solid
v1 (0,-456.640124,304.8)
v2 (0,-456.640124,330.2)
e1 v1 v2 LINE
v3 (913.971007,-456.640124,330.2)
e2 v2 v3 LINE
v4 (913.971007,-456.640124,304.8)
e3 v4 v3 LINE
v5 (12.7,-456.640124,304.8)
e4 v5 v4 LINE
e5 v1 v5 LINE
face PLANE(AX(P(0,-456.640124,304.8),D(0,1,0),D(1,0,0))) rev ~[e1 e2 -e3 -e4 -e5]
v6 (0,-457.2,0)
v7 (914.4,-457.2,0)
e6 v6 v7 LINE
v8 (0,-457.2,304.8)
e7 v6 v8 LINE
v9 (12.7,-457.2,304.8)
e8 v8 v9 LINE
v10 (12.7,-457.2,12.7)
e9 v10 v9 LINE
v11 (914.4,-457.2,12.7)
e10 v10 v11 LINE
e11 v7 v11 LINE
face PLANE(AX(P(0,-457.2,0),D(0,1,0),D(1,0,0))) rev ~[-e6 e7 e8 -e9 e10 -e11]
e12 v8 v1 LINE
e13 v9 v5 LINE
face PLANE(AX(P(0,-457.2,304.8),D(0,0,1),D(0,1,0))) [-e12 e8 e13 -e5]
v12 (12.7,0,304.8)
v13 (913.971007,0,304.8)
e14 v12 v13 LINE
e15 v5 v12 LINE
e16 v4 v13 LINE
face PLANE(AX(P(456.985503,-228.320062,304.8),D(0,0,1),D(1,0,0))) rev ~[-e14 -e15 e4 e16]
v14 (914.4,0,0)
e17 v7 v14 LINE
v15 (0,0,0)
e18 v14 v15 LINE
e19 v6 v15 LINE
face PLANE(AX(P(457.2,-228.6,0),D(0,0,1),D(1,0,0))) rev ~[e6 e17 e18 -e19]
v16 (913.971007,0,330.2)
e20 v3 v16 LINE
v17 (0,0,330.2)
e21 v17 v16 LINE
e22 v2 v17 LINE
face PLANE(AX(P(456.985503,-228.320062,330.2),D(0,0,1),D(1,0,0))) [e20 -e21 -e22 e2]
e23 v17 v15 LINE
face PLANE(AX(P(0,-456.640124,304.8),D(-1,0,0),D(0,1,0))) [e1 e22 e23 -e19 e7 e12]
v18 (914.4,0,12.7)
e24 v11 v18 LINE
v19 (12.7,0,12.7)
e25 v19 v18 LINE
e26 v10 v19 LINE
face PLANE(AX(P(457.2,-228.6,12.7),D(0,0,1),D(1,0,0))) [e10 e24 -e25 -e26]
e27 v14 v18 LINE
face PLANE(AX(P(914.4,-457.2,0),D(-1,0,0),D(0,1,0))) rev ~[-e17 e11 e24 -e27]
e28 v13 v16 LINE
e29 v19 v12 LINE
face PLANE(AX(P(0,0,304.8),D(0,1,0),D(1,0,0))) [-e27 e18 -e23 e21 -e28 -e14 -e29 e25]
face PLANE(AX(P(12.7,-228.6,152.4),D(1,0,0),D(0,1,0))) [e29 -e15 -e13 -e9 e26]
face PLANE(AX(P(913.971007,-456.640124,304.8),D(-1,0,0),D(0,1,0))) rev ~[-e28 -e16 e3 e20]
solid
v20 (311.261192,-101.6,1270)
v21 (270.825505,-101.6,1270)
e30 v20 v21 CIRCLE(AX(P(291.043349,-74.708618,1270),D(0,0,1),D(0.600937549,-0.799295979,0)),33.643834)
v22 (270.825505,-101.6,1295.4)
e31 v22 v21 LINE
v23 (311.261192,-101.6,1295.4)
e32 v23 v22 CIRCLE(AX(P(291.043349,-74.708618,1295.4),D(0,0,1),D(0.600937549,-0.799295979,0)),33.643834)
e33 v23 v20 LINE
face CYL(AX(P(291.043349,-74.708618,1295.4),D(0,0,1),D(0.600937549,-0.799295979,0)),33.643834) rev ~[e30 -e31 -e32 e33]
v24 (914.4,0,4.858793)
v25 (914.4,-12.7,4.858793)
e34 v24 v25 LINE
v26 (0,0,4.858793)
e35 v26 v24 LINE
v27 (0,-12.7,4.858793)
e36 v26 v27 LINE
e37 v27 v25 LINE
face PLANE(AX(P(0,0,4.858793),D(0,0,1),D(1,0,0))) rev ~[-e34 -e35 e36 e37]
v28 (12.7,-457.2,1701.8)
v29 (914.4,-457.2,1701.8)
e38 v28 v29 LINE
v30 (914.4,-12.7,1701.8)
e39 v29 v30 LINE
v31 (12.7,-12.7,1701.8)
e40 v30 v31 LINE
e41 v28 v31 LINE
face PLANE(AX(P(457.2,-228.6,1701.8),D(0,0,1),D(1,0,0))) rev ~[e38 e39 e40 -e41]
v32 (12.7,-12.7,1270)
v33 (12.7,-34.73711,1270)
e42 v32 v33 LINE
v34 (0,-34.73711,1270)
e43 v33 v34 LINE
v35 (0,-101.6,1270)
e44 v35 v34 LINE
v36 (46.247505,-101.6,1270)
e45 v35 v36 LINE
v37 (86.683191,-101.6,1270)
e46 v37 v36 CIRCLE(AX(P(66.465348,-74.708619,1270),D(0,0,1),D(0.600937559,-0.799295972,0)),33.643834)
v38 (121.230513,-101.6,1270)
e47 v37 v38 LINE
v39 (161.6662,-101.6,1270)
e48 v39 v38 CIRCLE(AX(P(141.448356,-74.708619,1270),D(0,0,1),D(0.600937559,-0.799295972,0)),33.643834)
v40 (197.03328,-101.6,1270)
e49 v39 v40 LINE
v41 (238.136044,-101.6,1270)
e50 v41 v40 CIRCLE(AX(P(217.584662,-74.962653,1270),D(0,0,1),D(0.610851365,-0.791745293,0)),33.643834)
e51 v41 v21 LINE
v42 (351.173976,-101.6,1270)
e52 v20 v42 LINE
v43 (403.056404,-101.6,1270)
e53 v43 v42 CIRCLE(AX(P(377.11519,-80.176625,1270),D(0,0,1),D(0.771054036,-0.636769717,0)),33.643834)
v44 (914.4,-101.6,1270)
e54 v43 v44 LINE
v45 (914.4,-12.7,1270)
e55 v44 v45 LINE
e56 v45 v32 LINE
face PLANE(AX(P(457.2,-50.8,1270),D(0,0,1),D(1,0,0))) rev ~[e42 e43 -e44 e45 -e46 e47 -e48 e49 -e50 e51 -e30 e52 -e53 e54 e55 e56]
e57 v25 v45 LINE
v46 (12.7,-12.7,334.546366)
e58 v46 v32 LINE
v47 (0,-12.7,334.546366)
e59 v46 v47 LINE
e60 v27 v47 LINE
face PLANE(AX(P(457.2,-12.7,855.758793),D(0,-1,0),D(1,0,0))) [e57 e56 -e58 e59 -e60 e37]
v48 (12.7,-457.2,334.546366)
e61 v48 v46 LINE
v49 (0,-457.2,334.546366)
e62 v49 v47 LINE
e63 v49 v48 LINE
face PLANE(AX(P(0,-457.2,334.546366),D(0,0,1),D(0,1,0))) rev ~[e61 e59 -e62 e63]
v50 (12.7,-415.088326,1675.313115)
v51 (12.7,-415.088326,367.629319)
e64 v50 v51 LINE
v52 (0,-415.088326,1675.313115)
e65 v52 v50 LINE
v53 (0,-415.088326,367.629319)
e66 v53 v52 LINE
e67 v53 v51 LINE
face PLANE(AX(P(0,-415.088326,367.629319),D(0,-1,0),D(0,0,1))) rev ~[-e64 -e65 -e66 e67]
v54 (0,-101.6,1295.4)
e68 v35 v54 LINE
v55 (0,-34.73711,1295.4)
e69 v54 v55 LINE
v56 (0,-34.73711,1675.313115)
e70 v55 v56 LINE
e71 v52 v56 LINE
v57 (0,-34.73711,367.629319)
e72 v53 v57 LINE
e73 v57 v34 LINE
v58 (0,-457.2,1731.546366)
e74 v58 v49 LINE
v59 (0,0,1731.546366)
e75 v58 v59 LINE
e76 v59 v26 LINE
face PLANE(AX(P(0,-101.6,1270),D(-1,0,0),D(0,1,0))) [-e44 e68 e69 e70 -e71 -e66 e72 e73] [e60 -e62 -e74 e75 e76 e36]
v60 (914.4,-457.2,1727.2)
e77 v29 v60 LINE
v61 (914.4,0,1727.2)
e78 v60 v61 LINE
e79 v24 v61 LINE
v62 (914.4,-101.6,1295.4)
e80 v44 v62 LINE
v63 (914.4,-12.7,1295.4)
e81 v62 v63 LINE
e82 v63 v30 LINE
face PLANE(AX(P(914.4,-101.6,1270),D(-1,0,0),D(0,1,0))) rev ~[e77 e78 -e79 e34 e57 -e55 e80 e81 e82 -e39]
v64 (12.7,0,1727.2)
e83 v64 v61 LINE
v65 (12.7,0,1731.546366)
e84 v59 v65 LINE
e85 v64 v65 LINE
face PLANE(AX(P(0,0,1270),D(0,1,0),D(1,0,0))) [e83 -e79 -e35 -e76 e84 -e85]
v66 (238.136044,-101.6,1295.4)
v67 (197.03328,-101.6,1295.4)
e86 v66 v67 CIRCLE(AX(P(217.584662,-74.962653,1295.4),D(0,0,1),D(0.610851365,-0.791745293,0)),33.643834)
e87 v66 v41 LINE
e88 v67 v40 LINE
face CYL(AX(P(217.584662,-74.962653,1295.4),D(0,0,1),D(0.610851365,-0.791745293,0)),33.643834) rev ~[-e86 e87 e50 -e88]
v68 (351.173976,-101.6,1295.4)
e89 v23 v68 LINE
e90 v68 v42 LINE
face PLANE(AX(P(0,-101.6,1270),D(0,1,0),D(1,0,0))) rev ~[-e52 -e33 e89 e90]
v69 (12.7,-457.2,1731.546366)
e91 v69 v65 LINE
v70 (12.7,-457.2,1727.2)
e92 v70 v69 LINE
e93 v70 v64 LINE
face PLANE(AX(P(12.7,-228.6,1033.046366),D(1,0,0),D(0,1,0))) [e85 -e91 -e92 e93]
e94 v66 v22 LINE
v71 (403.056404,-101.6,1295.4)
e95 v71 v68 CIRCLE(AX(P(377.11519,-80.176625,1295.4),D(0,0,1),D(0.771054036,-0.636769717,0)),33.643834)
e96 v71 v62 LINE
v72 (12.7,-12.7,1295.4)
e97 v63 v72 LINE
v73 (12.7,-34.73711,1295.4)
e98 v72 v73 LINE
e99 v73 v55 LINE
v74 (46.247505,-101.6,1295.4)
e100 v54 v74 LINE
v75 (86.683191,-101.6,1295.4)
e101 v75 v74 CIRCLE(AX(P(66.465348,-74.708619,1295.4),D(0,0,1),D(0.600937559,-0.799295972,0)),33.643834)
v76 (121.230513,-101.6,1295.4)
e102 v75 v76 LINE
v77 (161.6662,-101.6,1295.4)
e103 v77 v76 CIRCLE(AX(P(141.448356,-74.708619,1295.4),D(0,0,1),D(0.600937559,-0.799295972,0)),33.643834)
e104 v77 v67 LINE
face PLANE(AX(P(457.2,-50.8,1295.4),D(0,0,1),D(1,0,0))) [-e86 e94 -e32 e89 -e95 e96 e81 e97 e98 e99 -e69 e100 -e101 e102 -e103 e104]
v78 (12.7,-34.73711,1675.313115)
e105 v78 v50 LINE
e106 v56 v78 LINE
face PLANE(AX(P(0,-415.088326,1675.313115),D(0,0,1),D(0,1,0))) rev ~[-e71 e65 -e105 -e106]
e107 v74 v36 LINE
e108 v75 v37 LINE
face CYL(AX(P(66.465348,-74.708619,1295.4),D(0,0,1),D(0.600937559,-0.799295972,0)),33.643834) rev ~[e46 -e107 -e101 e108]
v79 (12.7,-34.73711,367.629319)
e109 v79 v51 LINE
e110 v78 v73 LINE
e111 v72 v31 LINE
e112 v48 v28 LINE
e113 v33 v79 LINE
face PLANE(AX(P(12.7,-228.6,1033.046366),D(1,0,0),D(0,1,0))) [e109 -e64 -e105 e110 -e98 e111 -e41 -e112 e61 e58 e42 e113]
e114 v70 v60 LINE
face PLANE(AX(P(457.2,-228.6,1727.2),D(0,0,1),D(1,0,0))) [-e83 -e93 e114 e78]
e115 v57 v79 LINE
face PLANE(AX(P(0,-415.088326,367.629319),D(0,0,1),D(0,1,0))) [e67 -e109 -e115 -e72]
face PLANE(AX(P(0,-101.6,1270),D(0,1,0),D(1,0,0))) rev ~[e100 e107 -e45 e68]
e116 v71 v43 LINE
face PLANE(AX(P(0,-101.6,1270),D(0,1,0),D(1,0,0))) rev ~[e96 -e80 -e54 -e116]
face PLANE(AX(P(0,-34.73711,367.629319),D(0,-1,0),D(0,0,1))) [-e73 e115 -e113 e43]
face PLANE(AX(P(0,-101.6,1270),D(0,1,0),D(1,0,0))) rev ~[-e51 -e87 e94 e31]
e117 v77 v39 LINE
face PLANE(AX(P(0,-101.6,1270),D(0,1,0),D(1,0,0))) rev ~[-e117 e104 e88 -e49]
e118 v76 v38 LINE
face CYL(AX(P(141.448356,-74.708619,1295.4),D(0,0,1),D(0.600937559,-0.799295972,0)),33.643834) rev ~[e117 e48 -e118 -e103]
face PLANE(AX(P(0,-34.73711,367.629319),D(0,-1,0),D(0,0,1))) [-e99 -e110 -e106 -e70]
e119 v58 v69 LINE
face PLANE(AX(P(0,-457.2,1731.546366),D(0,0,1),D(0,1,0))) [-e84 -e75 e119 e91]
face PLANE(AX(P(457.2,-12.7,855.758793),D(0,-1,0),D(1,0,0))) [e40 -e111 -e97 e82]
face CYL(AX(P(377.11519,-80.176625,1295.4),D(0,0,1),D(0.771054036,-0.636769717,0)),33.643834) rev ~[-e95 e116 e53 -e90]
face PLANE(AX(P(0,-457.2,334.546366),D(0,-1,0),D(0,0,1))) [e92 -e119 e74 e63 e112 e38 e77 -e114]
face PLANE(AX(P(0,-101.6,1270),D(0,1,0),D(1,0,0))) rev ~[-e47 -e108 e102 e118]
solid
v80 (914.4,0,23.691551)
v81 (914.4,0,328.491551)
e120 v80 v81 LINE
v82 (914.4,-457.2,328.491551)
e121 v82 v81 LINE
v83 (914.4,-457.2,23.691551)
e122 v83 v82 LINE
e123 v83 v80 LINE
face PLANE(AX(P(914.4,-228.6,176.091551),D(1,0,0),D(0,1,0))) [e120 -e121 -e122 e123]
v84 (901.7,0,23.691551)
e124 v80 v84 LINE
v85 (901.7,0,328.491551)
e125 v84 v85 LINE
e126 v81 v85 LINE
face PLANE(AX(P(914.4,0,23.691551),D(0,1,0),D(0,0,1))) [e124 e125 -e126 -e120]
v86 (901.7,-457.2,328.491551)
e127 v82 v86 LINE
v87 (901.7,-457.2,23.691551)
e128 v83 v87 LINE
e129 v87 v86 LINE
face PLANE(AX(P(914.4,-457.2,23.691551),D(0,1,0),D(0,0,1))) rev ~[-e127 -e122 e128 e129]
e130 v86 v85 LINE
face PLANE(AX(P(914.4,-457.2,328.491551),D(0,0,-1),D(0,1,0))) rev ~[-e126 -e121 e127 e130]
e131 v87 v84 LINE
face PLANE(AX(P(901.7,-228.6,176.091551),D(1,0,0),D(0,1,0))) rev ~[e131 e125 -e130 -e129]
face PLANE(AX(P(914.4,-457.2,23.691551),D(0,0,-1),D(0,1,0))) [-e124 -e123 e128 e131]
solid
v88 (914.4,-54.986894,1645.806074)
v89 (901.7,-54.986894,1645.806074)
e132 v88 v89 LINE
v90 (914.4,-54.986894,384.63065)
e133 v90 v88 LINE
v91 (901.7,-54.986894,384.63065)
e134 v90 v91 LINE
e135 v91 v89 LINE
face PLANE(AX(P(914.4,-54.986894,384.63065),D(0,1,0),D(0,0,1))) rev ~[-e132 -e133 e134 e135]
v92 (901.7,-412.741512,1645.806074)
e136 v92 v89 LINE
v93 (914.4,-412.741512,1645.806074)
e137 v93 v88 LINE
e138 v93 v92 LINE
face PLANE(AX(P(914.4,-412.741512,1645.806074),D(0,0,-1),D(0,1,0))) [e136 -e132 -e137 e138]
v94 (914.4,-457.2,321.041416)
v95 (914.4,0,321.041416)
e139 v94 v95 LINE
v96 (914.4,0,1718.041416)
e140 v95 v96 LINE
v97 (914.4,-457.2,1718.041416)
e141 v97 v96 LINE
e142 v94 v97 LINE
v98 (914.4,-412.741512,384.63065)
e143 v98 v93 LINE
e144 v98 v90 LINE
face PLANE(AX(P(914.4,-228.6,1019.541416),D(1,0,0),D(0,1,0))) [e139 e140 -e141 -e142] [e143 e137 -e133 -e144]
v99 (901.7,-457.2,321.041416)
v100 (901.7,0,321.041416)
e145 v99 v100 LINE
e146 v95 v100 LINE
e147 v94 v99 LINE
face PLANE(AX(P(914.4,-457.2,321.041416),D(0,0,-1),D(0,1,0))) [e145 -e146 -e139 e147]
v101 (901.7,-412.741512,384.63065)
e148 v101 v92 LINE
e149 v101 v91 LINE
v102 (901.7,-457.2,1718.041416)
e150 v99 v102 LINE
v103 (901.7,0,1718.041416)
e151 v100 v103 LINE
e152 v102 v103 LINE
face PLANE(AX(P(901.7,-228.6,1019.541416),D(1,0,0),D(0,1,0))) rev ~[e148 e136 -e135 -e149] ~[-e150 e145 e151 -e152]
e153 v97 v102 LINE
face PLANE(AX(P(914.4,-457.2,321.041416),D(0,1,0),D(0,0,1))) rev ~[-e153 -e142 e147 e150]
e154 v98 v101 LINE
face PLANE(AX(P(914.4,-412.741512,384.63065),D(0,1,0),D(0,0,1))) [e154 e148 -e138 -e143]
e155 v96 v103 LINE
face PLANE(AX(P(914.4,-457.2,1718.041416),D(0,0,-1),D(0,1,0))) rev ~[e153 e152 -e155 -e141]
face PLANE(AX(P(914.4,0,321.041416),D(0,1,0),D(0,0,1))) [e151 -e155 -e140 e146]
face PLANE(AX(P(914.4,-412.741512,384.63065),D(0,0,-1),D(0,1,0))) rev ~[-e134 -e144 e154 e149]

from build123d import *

# Parameters (mm, degrees)
F0_W      = 914.4
F0_H      = 457.2
F1_DEPTH  = 12.7
F2_W      = 457.2
F2_H      = 304.8
F3_DEPTH  = 12.7
F5_W      = 457.2
F5_H      = 304.8
F6_DEPTH  = 12.7
F8_W      = 913.9710068703
F8_H      = 456.640124321
F9_DEPTH  = 25.4
F10_W     = 914.4
F10_H     = 1701.8
F11_DEPTH = 12.7
F13_W     = 914.4
F13_H     = 457.2
F14_DEPTH = 25.4
F15_W     = 457.2
F15_H     = 1397
F16_DEPTH = 12.7
F17_W     = 357.7546179295
F17_H     = 1261.1754238605
F18_DEPTH = 914.401
F19_W     = 457.2
F19_H     = 1397
F20_DEPTH = 12.7
F21_W     = 380.351215601
F21_H     = 1307.6837956905
F22_DEPTH = 914.401
F24_W     = 914.4
F24_H     = 101.6
F25_DEPTH = 25.4
F27_DEPTH = 25.4
F29_DEPTH = 25.4
F31_DEPTH = 25.4
F33_DEPTH = 25.4
F35_DEPTH = 25.4


# Not quite as in the source:
# - ends of sketch curves that miss each other by under 0.0002 mm in the source are joined


with BuildPart() as f1:
    # F0 (on Top) → F1 (new body)
    with BuildSketch(Plane.XY):
        with Locations((457.2, -228.6)):
            Rectangle(F0_W, F0_H)
    extrude(amount=F1_DEPTH)

    # F2 (on Right) → F3 (join)
    with BuildSketch(Plane.YZ):
        with Locations((-228.6, 152.4)):
            Rectangle(F2_W, F2_H)
    extrude(amount=F3_DEPTH)

    # F8 (on offset) → F9 (join)
    with BuildSketch(Plane.XY.offset(304.8)):
        with Locations((456.9855034351, -228.3200621605)):
            Rectangle(F8_W, F8_H)
    extrude(amount=F9_DEPTH)


with BuildPart() as f6:
    # F5 (on offset) → F6 (new body)
    with BuildSketch(Plane.YZ.offset(914.4)):
        with Locations((-228.6, 176.0915509423)):
            Rectangle(F5_W, F5_H)
    extrude(amount=-F6_DEPTH)


with BuildPart() as f11:
    # F10 (on Front) → F11 (new body)
    with BuildSketch(Plane.XZ):
        with Locations((457.2, 855.7587931213)):
            Rectangle(F10_W, F10_H)
    extrude(amount=F11_DEPTH)

    # F13 (on offset) → F14 (join)
    with BuildSketch(Plane.XY.offset(1701.8)):
        with Locations((457.2, -228.6)):
            Rectangle(F13_W, F13_H)
    extrude(amount=F14_DEPTH)

    # F19 (on Right) → F20 (join)
    with BuildSketch(Plane.YZ):
        with Locations((-228.6, 1033.0463655774)):
            Rectangle(F19_W, F19_H)
    extrude(amount=F20_DEPTH)

    # F21 (on Right) → F22 (cut, through all)
    with BuildSketch(Plane.YZ):
        with Locations((-224.9127179384, 1021.4712172747)):
            Rectangle(F21_W, F21_H)
    extrude(amount=F22_DEPTH, mode=Mode.SUBTRACT)

    # F24 (on offset) → F25 (join)
    with BuildSketch(Plane.XY.offset(1270)):
        with Locations((457.2, -50.8)):
            Rectangle(F24_W, F24_H)
    extrude(amount=F25_DEPTH)

    # F26 (on face) → F27 (cut)
    with BuildSketch(Plane.XY.offset(1295.4)):
        with BuildLine():
            Line((46.2475046515, -101.6), (86.683191359, -101.6))
            ThreePointArc((86.683191359, -101.6), (66.4653480053, -41.0647853812), (46.2475046515, -101.6))
        make_face()
    extrude(amount=-F27_DEPTH, mode=Mode.SUBTRACT)

    # F28 (on face) → F29 (cut)
    with BuildSketch(Plane.XY.offset(1295.4)):
        with BuildLine():
            Line((121.2305128574, -101.6), (161.6661995649, -101.6))
            ThreePointArc((161.6661995649, -101.6), (141.4483562112, -41.0647853812), (121.2305128574, -101.6))
        make_face()
    extrude(amount=-F29_DEPTH, mode=Mode.SUBTRACT)

    # F30 (on face) → F31 (cut)
    with BuildSketch(Plane.XY.offset(1295.4)):
        with BuildLine():
            Line((197.0332803288, -101.6), (238.13604395, -101.6))
            ThreePointArc((238.13604395, -101.6), (217.5846621394, -41.3188191494), (197.0332803288, -101.6))
        make_face()
    extrude(amount=-F31_DEPTH, mode=Mode.SUBTRACT)

    # F32 (on face) → F33 (cut)
    with BuildSketch(Plane.XY.offset(1295.4)):
        with BuildLine():
            Line((270.8255052567, -101.6), (311.2611919641, -101.6))
            ThreePointArc((311.2611919641, -101.6), (291.0433486104, -41.0647841533), (270.8255052567, -101.6))
        make_face()
    extrude(amount=-F33_DEPTH, mode=Mode.SUBTRACT)

    # F34 (on face) → F35 (cut)
    with BuildSketch(Plane.XY.offset(1295.4)):
        with BuildLine():
            Line((351.1739761807, -101.6), (403.0564038776, -101.6))
            ThreePointArc((403.0564038776, -101.6), (377.1151900291, -46.5327916681), (351.1739761807, -101.6))
        make_face()
    extrude(amount=-F35_DEPTH, mode=Mode.SUBTRACT)


with BuildPart() as f16:
    # F15 (on offset) → F16 (new body)
    with BuildSketch(Plane.YZ.offset(914.4)):
        with Locations((-228.6, 1019.5414156894)):
            Rectangle(F15_W, F15_H)
    extrude(amount=-F16_DEPTH)

    # F17 (on offset) → F18 (cut, through all)
    with BuildSketch(Plane.YZ.offset(914.4)):
        with Locations((-233.8642030954, 1015.2183622122)):
            Rectangle(F17_W, F17_H)
    extrude(amount=-F18_DEPTH, mode=Mode.SUBTRACT)


solid = Compound([f1.part, f6.part, f11.part, f16.part])
